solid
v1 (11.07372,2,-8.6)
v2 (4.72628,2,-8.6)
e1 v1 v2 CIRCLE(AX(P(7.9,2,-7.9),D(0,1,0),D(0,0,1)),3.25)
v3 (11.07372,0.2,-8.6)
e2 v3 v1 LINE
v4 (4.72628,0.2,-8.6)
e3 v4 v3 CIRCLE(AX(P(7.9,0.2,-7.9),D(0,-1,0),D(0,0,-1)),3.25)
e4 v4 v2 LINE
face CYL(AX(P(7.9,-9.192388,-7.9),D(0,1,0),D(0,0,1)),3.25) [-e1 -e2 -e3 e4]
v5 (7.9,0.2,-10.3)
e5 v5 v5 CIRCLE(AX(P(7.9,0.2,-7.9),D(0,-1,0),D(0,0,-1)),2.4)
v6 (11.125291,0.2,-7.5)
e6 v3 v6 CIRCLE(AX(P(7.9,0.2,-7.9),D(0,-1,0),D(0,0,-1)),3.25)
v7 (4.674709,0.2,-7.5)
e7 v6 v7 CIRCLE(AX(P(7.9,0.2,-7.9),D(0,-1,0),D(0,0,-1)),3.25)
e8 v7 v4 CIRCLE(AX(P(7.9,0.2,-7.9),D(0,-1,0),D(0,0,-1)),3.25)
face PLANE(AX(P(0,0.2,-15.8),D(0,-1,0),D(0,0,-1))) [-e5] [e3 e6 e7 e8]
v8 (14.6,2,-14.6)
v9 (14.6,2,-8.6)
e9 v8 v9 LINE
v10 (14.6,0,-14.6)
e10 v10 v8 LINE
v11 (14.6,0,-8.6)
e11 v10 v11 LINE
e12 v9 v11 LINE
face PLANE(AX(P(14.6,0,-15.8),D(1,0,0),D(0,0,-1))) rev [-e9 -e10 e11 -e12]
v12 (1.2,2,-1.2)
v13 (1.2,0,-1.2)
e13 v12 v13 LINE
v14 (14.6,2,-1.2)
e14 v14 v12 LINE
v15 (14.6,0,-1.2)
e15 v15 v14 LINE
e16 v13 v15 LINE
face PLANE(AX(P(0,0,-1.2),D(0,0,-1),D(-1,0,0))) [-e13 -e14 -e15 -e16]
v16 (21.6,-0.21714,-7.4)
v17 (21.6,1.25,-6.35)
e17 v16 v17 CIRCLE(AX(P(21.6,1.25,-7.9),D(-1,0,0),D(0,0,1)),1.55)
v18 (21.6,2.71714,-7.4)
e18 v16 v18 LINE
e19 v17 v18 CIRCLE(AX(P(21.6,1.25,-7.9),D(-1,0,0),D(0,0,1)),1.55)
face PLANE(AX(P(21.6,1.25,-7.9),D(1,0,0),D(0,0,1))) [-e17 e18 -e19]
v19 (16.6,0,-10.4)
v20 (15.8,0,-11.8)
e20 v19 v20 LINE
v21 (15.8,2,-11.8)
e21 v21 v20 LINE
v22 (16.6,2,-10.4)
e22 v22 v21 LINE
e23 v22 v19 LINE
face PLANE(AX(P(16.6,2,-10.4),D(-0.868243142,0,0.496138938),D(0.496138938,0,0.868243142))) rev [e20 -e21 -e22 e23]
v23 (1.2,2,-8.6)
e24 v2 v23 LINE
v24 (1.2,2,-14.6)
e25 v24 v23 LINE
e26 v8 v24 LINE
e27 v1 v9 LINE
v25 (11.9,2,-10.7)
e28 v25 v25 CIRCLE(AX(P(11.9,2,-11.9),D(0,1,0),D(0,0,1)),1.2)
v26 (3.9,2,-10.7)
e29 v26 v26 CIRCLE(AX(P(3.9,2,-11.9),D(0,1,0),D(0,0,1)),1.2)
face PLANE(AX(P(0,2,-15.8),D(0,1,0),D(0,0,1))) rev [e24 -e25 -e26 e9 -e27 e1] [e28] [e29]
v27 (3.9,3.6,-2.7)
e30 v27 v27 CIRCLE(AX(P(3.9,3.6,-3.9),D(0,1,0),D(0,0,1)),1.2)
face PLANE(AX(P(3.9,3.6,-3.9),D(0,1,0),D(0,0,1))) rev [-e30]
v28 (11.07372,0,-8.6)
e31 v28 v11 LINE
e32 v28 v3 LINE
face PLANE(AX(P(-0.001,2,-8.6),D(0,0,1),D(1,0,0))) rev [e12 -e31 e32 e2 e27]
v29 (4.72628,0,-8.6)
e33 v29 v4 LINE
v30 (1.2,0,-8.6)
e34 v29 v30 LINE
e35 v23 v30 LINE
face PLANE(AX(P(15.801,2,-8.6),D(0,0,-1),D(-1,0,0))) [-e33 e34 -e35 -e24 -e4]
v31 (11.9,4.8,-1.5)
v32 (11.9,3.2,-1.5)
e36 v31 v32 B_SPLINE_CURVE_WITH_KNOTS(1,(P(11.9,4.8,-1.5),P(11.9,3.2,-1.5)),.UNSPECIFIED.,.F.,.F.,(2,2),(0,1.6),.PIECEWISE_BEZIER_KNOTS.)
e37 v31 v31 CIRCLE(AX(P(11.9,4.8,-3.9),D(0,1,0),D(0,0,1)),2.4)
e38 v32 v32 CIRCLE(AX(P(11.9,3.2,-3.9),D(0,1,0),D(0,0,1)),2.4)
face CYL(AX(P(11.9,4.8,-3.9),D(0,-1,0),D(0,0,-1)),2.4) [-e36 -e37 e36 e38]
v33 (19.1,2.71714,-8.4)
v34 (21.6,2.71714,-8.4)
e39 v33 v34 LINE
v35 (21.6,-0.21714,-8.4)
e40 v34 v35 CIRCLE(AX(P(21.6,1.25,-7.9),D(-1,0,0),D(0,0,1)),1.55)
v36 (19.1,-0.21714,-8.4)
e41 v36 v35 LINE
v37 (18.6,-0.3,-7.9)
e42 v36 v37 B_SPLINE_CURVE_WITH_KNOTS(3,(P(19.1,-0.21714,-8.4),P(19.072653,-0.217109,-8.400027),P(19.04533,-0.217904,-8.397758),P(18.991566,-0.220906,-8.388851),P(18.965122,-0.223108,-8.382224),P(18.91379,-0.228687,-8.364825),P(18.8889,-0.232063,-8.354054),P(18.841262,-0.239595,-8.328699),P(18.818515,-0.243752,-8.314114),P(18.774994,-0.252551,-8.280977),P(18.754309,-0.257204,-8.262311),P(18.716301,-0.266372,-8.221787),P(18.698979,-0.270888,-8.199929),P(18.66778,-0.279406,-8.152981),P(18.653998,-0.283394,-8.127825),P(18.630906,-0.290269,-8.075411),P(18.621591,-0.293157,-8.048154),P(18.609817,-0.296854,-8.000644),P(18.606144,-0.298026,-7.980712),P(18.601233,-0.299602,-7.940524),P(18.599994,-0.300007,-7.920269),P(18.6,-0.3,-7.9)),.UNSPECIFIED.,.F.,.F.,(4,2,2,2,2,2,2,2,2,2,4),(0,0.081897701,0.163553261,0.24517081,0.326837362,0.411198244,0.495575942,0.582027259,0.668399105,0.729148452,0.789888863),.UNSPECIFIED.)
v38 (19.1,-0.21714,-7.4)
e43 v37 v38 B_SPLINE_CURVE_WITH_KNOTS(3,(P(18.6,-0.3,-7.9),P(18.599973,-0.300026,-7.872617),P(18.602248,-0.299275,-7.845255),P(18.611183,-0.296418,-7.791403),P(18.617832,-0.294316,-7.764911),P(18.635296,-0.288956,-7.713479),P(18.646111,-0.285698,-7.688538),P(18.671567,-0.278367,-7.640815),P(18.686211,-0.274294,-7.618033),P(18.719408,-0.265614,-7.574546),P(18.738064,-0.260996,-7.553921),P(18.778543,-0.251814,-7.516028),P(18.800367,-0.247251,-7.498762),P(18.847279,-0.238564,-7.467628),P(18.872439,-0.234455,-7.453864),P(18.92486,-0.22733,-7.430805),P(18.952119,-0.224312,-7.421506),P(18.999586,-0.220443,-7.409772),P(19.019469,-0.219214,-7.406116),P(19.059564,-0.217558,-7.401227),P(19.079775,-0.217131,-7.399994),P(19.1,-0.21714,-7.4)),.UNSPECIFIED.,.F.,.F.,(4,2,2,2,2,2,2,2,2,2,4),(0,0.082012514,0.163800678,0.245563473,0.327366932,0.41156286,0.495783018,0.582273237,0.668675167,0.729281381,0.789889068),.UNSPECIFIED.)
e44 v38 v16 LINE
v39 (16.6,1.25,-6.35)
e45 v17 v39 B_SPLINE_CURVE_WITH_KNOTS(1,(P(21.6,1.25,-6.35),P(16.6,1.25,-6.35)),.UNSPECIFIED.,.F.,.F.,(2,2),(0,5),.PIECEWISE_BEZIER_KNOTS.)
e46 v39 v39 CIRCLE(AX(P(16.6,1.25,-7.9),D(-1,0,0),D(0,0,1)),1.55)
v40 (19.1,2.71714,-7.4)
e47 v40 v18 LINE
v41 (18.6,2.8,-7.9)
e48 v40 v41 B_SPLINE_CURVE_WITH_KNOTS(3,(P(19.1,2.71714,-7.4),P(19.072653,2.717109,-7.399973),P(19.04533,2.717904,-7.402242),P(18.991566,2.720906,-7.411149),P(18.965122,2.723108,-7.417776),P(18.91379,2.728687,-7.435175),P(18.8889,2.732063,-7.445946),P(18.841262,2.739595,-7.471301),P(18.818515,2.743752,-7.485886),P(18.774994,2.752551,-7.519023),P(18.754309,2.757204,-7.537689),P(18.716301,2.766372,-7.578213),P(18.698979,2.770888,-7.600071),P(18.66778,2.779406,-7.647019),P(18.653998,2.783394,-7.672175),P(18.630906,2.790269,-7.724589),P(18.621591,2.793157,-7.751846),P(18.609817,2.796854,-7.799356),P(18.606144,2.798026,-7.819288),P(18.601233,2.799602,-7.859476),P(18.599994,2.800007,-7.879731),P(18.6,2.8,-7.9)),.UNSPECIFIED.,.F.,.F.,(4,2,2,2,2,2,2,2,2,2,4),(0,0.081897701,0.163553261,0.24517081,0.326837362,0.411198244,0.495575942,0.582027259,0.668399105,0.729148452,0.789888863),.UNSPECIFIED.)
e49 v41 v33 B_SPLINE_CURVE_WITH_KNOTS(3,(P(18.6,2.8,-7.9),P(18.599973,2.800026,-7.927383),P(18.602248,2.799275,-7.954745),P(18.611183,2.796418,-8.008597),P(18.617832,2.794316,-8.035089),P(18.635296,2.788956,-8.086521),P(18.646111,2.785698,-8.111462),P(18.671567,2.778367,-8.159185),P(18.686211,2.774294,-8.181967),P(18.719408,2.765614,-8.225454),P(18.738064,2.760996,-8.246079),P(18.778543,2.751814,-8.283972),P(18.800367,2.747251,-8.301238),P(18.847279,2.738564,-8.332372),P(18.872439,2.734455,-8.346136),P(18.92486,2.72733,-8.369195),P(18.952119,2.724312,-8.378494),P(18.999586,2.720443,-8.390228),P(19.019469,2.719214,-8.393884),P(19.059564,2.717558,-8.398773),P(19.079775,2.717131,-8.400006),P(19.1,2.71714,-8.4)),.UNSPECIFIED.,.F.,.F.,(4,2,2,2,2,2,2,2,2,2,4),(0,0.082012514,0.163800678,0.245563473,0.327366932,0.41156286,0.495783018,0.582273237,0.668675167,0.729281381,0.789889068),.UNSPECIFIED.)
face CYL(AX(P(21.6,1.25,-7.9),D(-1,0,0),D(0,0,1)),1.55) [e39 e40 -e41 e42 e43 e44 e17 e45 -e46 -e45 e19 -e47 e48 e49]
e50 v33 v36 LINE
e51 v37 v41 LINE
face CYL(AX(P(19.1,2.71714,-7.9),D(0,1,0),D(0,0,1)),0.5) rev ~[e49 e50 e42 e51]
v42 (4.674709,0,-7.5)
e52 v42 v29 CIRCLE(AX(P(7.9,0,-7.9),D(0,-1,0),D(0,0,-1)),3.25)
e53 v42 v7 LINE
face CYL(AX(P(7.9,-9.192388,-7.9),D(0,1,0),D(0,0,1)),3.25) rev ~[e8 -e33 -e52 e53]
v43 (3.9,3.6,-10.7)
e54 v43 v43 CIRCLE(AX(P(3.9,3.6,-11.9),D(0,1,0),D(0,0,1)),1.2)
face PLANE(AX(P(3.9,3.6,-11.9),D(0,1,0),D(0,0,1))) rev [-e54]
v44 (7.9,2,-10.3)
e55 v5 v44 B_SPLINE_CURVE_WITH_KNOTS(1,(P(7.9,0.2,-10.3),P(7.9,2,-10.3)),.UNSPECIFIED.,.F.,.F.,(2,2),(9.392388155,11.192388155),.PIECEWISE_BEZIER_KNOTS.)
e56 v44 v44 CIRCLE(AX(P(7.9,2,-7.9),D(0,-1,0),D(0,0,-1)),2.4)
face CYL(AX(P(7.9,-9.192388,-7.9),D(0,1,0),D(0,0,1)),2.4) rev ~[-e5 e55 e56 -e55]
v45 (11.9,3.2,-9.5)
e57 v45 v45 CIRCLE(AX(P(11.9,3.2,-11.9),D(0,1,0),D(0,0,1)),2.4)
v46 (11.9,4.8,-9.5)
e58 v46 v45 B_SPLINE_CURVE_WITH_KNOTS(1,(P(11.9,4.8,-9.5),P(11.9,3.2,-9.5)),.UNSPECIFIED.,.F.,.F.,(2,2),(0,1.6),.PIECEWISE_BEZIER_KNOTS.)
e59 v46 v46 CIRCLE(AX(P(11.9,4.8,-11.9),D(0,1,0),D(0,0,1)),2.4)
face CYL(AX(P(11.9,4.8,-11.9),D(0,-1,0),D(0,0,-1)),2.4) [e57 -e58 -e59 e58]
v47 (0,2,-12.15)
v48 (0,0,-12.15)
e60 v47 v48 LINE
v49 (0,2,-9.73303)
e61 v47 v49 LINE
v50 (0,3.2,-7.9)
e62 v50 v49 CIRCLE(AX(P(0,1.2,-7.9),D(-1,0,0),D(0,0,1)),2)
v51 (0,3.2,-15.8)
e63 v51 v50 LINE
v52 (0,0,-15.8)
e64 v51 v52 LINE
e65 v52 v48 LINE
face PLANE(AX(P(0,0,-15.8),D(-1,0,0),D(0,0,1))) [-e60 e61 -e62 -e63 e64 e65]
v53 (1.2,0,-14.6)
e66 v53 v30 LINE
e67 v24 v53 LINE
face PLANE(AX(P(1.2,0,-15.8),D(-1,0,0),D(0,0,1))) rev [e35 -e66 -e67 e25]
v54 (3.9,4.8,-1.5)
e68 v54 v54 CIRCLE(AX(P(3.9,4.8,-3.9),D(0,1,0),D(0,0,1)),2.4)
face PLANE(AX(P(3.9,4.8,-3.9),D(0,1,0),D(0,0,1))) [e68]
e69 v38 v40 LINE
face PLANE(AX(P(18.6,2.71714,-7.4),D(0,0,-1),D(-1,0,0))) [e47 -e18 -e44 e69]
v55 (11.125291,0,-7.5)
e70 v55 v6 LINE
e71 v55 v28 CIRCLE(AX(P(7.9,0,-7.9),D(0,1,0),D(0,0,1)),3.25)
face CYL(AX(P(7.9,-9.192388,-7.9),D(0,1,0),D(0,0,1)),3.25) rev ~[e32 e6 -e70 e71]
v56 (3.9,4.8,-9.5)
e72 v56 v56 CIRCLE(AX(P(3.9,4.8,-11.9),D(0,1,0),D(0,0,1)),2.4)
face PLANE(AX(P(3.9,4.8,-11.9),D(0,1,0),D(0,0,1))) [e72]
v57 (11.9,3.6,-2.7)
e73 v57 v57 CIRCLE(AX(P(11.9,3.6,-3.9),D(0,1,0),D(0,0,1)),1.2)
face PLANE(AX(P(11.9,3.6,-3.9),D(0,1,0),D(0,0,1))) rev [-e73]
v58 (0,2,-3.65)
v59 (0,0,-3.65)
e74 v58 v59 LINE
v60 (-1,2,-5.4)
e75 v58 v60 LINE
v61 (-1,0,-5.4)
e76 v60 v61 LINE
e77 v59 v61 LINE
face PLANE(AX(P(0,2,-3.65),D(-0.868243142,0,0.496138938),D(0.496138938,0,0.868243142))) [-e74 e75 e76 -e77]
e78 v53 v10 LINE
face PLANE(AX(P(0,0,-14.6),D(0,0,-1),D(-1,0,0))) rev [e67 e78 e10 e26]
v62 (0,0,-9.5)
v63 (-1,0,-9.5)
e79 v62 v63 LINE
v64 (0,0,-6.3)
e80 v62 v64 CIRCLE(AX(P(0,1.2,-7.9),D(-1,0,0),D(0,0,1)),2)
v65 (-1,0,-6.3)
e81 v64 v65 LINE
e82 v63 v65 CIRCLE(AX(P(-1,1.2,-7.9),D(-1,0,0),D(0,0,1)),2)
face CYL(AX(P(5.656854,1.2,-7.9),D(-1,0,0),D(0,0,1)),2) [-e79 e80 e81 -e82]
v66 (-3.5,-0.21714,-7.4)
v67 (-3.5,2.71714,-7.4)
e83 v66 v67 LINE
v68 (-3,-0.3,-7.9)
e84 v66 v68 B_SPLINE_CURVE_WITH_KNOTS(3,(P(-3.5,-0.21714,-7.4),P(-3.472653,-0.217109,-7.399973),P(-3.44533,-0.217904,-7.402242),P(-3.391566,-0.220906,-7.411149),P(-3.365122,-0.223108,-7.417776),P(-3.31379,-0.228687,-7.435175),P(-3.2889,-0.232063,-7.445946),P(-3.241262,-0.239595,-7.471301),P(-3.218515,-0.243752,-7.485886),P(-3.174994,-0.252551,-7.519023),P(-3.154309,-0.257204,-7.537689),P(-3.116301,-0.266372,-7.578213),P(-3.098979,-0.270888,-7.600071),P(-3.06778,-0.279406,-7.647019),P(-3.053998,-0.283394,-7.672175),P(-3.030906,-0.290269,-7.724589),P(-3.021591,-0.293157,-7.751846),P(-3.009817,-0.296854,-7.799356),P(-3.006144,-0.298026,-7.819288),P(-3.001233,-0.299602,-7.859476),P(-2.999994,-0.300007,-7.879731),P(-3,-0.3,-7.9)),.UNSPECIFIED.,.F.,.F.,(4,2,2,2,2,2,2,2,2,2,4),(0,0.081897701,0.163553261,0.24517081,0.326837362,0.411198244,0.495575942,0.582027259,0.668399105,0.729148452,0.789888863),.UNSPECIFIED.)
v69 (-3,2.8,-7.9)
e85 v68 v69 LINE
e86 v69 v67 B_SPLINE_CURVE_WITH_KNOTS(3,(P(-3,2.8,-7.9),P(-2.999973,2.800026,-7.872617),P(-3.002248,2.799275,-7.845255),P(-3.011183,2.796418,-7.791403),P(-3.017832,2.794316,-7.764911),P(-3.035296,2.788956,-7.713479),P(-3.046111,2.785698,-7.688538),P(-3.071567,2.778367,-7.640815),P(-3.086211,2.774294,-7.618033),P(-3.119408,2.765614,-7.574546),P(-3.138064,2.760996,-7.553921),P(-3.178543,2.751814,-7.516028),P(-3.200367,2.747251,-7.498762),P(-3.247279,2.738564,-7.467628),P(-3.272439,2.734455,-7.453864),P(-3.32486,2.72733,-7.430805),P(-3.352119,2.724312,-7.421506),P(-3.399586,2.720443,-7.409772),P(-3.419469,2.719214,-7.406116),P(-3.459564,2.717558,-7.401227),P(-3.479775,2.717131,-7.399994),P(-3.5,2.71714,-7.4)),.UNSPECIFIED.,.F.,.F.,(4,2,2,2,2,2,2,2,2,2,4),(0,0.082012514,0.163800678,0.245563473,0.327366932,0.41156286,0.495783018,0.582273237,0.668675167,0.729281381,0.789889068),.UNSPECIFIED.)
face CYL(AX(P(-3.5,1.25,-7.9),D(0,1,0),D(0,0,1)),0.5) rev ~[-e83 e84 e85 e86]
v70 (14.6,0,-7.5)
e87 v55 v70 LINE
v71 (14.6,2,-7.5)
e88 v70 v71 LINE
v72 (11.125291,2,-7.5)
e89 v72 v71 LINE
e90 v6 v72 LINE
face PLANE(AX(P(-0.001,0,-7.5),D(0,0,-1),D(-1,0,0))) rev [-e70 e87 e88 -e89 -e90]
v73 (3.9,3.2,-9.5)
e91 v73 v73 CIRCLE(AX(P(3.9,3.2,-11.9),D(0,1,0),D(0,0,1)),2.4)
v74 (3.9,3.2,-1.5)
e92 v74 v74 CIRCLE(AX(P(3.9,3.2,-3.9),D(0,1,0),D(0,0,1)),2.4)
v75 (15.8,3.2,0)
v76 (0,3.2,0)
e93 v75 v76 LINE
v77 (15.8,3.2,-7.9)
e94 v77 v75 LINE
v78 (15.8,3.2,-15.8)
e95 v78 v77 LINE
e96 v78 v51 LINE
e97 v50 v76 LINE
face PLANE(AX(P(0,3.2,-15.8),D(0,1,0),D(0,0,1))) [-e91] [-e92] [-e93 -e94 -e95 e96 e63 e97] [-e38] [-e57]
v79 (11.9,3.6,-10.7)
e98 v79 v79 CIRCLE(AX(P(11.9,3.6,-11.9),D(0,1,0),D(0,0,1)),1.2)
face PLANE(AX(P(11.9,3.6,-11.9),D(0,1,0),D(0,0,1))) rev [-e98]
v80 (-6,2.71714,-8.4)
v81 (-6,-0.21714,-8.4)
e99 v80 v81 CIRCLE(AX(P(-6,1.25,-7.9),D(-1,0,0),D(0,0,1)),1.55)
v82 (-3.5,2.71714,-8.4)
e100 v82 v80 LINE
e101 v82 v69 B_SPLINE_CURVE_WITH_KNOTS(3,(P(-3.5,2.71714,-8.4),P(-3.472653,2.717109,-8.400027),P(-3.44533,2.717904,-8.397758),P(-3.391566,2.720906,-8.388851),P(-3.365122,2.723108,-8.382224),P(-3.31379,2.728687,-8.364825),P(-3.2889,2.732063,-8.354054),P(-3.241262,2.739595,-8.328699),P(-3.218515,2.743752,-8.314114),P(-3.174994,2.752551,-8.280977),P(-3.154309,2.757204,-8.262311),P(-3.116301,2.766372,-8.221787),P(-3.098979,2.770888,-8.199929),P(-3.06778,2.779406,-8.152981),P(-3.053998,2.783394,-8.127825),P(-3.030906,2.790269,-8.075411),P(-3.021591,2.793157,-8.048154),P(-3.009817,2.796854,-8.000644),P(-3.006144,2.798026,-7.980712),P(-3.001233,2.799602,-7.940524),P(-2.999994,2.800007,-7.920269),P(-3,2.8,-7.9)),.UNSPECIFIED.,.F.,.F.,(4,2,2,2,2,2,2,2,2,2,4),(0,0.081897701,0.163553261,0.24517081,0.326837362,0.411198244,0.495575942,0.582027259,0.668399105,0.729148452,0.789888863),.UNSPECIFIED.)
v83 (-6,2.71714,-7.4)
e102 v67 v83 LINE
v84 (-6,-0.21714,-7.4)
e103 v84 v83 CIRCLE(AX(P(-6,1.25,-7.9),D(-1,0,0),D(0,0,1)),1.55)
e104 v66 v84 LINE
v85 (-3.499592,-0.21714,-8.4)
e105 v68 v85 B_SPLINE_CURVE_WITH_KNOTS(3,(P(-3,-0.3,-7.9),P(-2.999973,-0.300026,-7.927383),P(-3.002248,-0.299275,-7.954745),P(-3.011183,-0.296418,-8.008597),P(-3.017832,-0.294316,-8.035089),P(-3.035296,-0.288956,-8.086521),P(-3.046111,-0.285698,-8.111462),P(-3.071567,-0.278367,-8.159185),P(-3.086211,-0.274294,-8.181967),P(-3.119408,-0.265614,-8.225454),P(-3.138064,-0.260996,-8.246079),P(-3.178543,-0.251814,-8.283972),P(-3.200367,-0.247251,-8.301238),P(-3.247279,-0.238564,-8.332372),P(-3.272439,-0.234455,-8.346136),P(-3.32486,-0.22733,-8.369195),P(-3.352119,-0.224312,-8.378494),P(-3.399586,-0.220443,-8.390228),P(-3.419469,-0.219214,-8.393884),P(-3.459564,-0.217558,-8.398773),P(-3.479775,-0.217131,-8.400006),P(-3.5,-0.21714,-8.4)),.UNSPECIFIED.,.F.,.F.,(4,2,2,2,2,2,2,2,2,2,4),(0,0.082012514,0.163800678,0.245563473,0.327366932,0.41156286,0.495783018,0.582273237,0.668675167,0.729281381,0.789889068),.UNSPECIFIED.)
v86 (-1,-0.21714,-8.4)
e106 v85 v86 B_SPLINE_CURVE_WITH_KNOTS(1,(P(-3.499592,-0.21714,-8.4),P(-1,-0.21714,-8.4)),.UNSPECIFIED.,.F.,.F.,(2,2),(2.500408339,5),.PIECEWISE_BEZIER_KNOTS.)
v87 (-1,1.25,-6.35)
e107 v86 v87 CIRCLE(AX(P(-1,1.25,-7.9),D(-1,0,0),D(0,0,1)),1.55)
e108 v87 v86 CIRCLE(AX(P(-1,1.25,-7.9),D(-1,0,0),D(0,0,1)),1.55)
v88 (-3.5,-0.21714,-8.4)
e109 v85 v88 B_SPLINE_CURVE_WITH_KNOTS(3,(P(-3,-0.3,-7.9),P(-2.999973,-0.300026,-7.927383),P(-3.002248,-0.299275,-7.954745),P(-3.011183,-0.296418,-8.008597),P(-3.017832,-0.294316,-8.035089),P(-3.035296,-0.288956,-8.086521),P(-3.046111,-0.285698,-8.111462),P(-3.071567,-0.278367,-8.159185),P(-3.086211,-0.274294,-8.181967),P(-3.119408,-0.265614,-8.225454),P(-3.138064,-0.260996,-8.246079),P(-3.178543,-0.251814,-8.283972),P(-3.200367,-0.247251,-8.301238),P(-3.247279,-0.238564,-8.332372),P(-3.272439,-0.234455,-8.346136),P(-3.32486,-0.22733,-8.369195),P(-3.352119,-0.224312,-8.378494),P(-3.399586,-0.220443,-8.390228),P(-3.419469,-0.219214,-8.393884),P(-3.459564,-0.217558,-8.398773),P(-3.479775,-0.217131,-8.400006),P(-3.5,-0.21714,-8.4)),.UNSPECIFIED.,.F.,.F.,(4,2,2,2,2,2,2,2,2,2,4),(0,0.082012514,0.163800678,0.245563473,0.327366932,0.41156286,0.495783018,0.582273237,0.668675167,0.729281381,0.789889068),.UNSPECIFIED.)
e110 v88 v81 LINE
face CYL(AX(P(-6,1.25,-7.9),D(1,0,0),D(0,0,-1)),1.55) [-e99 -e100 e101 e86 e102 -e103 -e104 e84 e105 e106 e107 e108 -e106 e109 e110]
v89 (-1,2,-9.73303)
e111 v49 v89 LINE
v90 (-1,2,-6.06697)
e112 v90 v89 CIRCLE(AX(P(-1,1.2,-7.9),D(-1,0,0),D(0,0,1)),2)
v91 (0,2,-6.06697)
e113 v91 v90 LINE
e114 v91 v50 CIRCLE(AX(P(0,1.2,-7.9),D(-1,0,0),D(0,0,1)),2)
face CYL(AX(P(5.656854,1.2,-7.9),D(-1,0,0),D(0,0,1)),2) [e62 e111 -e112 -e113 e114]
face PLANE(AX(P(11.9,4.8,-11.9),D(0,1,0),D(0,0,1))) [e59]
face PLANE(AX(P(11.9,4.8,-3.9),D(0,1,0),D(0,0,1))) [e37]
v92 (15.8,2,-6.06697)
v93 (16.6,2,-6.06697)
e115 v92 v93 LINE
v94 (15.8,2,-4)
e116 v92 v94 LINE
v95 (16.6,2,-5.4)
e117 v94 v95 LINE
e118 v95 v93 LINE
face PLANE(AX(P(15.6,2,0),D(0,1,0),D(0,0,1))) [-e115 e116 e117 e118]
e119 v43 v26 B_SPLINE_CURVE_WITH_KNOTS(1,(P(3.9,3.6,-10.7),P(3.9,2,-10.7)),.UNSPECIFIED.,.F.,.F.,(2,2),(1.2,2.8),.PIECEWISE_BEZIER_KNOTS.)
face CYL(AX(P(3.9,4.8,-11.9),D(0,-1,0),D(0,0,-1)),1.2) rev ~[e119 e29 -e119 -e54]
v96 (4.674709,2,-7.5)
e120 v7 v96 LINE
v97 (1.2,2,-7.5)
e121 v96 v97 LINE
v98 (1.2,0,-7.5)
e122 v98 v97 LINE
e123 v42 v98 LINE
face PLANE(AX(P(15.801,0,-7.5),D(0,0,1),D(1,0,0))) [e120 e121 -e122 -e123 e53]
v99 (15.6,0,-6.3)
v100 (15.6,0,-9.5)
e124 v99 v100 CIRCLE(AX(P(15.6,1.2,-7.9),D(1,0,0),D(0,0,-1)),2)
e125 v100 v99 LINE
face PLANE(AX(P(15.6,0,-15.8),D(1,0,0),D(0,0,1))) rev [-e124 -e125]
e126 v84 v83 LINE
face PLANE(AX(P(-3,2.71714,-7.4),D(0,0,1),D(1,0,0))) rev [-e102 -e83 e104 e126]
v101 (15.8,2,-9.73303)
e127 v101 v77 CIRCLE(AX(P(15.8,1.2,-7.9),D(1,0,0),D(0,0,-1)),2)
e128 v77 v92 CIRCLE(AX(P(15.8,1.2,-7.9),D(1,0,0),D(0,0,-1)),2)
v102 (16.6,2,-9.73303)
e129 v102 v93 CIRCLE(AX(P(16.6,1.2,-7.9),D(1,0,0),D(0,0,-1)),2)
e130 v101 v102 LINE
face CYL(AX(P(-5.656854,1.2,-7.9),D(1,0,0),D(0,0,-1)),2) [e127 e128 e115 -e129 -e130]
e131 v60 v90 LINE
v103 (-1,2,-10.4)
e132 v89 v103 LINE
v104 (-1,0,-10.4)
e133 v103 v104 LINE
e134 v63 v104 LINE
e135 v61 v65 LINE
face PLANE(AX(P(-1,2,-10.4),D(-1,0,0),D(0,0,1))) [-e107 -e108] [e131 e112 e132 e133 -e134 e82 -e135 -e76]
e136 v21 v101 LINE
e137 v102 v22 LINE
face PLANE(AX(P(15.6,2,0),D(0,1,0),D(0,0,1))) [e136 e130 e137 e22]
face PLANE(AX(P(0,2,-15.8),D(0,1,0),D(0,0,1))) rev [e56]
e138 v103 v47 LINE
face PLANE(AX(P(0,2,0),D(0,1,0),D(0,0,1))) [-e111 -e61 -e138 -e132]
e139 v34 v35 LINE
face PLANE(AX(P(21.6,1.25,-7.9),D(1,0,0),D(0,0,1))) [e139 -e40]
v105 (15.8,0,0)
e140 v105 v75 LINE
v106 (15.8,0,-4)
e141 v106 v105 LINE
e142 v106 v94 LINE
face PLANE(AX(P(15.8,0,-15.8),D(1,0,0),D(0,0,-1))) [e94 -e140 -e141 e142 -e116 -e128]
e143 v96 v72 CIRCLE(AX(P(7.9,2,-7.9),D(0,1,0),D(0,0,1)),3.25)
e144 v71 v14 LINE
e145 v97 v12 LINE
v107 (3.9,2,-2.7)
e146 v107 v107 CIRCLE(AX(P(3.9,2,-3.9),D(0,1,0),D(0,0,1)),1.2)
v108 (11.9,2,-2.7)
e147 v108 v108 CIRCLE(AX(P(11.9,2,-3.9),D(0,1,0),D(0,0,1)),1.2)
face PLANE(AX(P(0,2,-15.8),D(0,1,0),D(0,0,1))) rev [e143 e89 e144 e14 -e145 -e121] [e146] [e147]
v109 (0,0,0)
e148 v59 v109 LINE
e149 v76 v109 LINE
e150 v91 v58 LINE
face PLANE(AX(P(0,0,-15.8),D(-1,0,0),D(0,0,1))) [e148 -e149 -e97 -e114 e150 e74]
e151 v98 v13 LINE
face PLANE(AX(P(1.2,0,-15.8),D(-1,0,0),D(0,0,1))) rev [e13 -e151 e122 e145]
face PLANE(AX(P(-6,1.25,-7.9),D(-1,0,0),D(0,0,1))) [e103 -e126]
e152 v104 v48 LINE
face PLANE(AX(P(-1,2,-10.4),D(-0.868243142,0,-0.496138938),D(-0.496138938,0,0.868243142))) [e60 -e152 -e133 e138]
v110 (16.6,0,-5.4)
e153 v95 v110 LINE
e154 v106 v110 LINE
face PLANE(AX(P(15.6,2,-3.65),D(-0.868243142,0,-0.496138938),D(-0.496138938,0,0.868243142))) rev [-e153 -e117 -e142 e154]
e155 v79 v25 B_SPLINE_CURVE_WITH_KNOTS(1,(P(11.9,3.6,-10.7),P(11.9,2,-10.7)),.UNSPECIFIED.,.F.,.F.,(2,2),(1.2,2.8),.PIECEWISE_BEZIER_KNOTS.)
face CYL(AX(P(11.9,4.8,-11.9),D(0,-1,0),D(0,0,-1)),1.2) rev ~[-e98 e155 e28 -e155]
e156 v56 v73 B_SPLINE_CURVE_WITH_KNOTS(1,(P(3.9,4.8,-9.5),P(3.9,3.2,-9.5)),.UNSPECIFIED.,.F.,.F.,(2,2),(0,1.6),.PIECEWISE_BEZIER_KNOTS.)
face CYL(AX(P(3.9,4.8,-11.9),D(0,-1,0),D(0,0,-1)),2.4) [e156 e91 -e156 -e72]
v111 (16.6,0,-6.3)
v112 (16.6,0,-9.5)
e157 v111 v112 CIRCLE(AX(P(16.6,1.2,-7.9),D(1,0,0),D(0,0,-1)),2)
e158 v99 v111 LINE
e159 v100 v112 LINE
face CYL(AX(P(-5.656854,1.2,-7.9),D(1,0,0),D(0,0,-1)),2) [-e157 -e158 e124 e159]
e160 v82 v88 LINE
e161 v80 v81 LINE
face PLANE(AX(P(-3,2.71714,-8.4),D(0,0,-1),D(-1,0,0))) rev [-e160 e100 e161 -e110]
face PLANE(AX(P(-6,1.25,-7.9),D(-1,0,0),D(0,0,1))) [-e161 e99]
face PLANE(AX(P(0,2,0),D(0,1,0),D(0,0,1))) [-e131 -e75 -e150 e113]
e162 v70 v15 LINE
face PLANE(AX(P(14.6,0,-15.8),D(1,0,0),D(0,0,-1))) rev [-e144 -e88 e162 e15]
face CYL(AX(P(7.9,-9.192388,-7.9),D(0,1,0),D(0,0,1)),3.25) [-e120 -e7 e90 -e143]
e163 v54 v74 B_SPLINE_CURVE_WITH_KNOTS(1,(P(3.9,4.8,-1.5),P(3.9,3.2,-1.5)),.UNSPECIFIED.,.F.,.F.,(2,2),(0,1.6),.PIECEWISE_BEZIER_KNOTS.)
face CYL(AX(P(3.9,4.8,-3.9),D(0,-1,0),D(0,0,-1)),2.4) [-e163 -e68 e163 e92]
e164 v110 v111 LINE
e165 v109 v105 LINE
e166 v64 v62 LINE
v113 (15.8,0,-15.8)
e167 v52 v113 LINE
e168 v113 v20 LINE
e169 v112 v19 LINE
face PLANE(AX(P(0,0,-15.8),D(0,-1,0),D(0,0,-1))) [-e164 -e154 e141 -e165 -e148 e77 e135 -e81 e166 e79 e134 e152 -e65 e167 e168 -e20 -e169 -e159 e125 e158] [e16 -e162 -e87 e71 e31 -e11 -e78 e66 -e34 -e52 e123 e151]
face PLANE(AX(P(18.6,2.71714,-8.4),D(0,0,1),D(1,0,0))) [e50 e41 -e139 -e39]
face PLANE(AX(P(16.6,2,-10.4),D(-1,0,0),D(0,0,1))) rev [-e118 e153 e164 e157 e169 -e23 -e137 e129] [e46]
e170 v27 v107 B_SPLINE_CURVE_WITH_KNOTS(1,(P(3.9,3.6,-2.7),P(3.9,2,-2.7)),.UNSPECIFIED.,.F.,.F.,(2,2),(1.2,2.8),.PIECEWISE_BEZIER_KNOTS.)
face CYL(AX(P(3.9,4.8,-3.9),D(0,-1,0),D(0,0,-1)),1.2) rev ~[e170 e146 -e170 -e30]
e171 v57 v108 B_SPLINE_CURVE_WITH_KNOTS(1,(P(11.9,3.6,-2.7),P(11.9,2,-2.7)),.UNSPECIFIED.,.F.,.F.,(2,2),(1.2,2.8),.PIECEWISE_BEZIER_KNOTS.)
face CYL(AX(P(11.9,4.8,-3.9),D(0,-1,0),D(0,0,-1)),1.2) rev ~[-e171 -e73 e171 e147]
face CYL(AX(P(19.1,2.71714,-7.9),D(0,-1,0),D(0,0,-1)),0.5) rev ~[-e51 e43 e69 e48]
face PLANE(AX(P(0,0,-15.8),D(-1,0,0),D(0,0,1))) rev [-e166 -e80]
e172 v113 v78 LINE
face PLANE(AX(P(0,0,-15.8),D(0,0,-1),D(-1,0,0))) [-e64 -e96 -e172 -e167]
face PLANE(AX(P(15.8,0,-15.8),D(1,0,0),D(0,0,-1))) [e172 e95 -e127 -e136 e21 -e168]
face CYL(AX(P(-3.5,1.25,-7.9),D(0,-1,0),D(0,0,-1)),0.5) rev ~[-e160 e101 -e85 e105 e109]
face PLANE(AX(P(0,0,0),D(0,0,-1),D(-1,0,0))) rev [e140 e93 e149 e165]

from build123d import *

# Parameters (mm, degrees)
SKETCH1_W                = 15.8
SKETCH1_H                = 3.2
BOSS_EXTRUDE1_DEPTH      = 15.8
SKETCH2_R                = 2.4
BOSS_EXTRUDE2_DEPTH      = 1.6
LPATTERN1_COUNT          = 2
LPATTERN1_PITCH          = 8
LPATTERN1_COUNT_DIR2     = 4
LPATTERN1_PITCH_DIR2     = 8
SHELL1_T                 = -1.2
SKETCH4_R                = 3.25
SKETCH4_R_2              = 2.4
BOSS_EXTRUDE3_DEPTH      = 1.8
BOSS_EXTRUDE4_REACH      = 24.042
BOSS_EXTRUDE4_END_RADIUS = 3.25
SKETCH6_W                = 1.1
SKETCH6_H                = 2
MIRROR1_DEPTH            = 2
BOSS_EXTRUDE6_DEPTH      = 2
BOSS_EXTRUDE7_START      = -0.3
SKETCH9_R                = 2
BOSS_EXTRUDE7_DEPTH      = 1
SKETCH10_R               = 1.55
BOSS_EXTRUDE8_DEPTH      = 5
CUT_EXTRUDE1_START       = -3
CUT_EXTRUDE1_DEPTH       = 3
FILLET1_R                = 0.5
FILLET1_OF_MIRROR2_R     = 0.5


# Read off the part's stored shape, not the designer's step: Mirror1
with BuildPart() as part:
    # Sketch1 → Boss-Extrude1 (new body)
    with BuildSketch(Plane.XY):
        with Locations((7.9, 1.6)):
            Rectangle(SKETCH1_W, SKETCH1_H)
    extrude(amount=-BOSS_EXTRUDE1_DEPTH)

    # Sketch2 → Boss-Extrude2 (add)
    with BuildSketch(Plane(origin=(0, 3.2, 0), x_dir=(1, 0, 0), z_dir=(0, 1, 0))):
        with Locations(Location((3.9, 3.9, 0), (0, 0, 270))):
            Circle(SKETCH2_R)
    boss_extrude2 = extrude(amount=BOSS_EXTRUDE2_DEPTH)

    # LPattern1: Boss-Extrude2 2 × 4, 4 skipped
    with Locations(*[(j * LPATTERN1_PITCH_DIR2, 0, -i * LPATTERN1_PITCH) for i in range(LPATTERN1_COUNT) for j in range(LPATTERN1_COUNT_DIR2) if (i, j) not in ((0, 0), (0, 2), (0, 3), (1, 2), (1, 3))]):
        add(boss_extrude2)

    # Shell1
    shell1_openings = [part.faces().sort_by_distance(p)[0] for p in [
        (7.9, 0, -7.9),
    ]]
    offset(amount=SHELL1_T, openings=shell1_openings, kind=Kind.INTERSECTION)

    # Sketch4 → Boss-Extrude3 (add)
    with BuildSketch(Plane.XZ.offset(-2)):
        with Locations(Location((7.9, -7.9, 0), (0, 0, 90))):
            Circle(SKETCH4_R)
        with Locations(Location((7.9, -7.9, 0), (0, 0, 270))):
            Circle(SKETCH4_R_2, mode=Mode.SUBTRACT)
    extrude(amount=BOSS_EXTRUDE3_DEPTH)

    # Boss-Extrude4: up to this cylinder (the profile starts outside it)
    boss_extrude4_end = Plane(origin=(7.9, 1, -7.9), z_dir=(0, 1, 0)) * Cylinder(BOSS_EXTRUDE4_END_RADIUS, 55.584, mode=Mode.PRIVATE)
    # Sketch6 → Boss-Extrude4 (add, up to the surface)
    with BuildSketch(Plane.ZY.offset(-14.6), mode=Mode.PRIVATE) as boss_extrude4_sk1:
        with Locations((-8.05, 1)):
            Rectangle(SKETCH6_W, SKETCH6_H)
    boss_extrude4_tool1 = extrude(boss_extrude4_sk1.sketch, amount=BOSS_EXTRUDE4_REACH, mode=Mode.PRIVATE) - boss_extrude4_end
    add(boss_extrude4_tool1.solids().sort_by_distance((14.6, 1, -8.05))[0])

    # Mirror1 outline → Mirror1 (add)
    with BuildSketch(Plane(origin=(0, 0, 0), x_dir=(1, 0, 0), z_dir=(0, 1, 0))):
        with BuildLine():
            Line((1.2, 8.6), (1.2, 7.5))
            Line((1.2, 7.5), (4.674709315, 7.5))
            ThreePointArc((4.674709315, 7.5), (4.653565784, 8.052200126), (4.726279785, 8.6))
            Line((4.726279785, 8.6), (1.2, 8.6))
        make_face()
    extrude(amount=MIRROR1_DEPTH)

    # Sketch8 → Boss-Extrude6 (add)
    with BuildSketch(Plane(origin=(0, 0, 0), x_dir=(-1, 0, 0), z_dir=(0, -1, 0))):
        Polygon((1, 10.4), (0, 12.15), (0, 3.65), (1, 5.4), (1, 6.4), (0.3, 6.4), (0.3, 9.4), (1, 9.4), align=None)
    boss_extrude6 = extrude(amount=-BOSS_EXTRUDE6_DEPTH)

    # Sketch9 → Boss-Extrude7 (add)
    with BuildSketch(Plane.ZY.offset(0.3).offset(BOSS_EXTRUDE7_START)):
        with Locations((-7.9, 1.2)):
            Circle(SKETCH9_R)
    boss_extrude7 = extrude(amount=BOSS_EXTRUDE7_DEPTH)

    # Sketch10 → Boss-Extrude8 (add)
    with BuildSketch(Plane.ZY.offset(1)):
        with Locations((-7.9, 1.25)):
            Circle(SKETCH10_R)
    boss_extrude8 = extrude(amount=BOSS_EXTRUDE8_DEPTH)

    # Sketch11 → Cut-Extrude1 (cut)
    with BuildSketch(Plane.ZY.offset(6).offset(CUT_EXTRUDE1_START)):
        with BuildLine():
            Line((-8.4, 2.717140075), (-8.4, -0.217140075))
            ThreePointArc((-8.4, -0.217140075), (-7.9, -0.3), (-7.4, -0.217140075))
            Line((-7.4, -0.217140075), (-7.4, 2.717140075))
            ThreePointArc((-7.4, 2.717140075), (-7.9, 2.8), (-8.4, 2.717140075))
        make_face()
    cut_extrude1 = extrude(amount=CUT_EXTRUDE1_DEPTH, mode=Mode.SUBTRACT)

    # Fillet1
    fillet1_edges = [part.edges().sort_by_distance(p)[0] for p in [
        (-3, 1.25, -8.4),
        (-3, 1.25, -7.4),
    ]]
    fillet(fillet1_edges, radius=FILLET1_R - 0.0001)  # a hair under: the kernel refuses the full size

    # Mirror2: Boss-Extrude6, Boss-Extrude7, Boss-Extrude8, Cut-Extrude1 across plane
    add(boss_extrude6.mirror(Plane(origin=(7.8, 0, 0), x_dir=(0, 0, 1), z_dir=(1, 0, 0))))
    add(boss_extrude7.mirror(Plane(origin=(7.8, 0, 0), x_dir=(0, 0, 1), z_dir=(1, 0, 0))))
    add(boss_extrude8.mirror(Plane(origin=(7.8, 0, 0), x_dir=(0, 0, 1), z_dir=(1, 0, 0))))
    add(cut_extrude1.mirror(Plane(origin=(7.8, 0, 0), x_dir=(0, 0, 1), z_dir=(1, 0, 0))), mode=Mode.SUBTRACT)

    # Fillet1 of Mirror2
    fillet1_of_mirror2_edges = [part.edges().sort_by_distance(p)[0] for p in [
        (18.6, 1.25, -8.4),
        (18.6, 1.25, -7.4),
    ]]
    fillet(fillet1_of_mirror2_edges, radius=FILLET1_OF_MIRROR2_R - 0.0001)  # a hair under: the kernel refuses the full size


solid = part.part
